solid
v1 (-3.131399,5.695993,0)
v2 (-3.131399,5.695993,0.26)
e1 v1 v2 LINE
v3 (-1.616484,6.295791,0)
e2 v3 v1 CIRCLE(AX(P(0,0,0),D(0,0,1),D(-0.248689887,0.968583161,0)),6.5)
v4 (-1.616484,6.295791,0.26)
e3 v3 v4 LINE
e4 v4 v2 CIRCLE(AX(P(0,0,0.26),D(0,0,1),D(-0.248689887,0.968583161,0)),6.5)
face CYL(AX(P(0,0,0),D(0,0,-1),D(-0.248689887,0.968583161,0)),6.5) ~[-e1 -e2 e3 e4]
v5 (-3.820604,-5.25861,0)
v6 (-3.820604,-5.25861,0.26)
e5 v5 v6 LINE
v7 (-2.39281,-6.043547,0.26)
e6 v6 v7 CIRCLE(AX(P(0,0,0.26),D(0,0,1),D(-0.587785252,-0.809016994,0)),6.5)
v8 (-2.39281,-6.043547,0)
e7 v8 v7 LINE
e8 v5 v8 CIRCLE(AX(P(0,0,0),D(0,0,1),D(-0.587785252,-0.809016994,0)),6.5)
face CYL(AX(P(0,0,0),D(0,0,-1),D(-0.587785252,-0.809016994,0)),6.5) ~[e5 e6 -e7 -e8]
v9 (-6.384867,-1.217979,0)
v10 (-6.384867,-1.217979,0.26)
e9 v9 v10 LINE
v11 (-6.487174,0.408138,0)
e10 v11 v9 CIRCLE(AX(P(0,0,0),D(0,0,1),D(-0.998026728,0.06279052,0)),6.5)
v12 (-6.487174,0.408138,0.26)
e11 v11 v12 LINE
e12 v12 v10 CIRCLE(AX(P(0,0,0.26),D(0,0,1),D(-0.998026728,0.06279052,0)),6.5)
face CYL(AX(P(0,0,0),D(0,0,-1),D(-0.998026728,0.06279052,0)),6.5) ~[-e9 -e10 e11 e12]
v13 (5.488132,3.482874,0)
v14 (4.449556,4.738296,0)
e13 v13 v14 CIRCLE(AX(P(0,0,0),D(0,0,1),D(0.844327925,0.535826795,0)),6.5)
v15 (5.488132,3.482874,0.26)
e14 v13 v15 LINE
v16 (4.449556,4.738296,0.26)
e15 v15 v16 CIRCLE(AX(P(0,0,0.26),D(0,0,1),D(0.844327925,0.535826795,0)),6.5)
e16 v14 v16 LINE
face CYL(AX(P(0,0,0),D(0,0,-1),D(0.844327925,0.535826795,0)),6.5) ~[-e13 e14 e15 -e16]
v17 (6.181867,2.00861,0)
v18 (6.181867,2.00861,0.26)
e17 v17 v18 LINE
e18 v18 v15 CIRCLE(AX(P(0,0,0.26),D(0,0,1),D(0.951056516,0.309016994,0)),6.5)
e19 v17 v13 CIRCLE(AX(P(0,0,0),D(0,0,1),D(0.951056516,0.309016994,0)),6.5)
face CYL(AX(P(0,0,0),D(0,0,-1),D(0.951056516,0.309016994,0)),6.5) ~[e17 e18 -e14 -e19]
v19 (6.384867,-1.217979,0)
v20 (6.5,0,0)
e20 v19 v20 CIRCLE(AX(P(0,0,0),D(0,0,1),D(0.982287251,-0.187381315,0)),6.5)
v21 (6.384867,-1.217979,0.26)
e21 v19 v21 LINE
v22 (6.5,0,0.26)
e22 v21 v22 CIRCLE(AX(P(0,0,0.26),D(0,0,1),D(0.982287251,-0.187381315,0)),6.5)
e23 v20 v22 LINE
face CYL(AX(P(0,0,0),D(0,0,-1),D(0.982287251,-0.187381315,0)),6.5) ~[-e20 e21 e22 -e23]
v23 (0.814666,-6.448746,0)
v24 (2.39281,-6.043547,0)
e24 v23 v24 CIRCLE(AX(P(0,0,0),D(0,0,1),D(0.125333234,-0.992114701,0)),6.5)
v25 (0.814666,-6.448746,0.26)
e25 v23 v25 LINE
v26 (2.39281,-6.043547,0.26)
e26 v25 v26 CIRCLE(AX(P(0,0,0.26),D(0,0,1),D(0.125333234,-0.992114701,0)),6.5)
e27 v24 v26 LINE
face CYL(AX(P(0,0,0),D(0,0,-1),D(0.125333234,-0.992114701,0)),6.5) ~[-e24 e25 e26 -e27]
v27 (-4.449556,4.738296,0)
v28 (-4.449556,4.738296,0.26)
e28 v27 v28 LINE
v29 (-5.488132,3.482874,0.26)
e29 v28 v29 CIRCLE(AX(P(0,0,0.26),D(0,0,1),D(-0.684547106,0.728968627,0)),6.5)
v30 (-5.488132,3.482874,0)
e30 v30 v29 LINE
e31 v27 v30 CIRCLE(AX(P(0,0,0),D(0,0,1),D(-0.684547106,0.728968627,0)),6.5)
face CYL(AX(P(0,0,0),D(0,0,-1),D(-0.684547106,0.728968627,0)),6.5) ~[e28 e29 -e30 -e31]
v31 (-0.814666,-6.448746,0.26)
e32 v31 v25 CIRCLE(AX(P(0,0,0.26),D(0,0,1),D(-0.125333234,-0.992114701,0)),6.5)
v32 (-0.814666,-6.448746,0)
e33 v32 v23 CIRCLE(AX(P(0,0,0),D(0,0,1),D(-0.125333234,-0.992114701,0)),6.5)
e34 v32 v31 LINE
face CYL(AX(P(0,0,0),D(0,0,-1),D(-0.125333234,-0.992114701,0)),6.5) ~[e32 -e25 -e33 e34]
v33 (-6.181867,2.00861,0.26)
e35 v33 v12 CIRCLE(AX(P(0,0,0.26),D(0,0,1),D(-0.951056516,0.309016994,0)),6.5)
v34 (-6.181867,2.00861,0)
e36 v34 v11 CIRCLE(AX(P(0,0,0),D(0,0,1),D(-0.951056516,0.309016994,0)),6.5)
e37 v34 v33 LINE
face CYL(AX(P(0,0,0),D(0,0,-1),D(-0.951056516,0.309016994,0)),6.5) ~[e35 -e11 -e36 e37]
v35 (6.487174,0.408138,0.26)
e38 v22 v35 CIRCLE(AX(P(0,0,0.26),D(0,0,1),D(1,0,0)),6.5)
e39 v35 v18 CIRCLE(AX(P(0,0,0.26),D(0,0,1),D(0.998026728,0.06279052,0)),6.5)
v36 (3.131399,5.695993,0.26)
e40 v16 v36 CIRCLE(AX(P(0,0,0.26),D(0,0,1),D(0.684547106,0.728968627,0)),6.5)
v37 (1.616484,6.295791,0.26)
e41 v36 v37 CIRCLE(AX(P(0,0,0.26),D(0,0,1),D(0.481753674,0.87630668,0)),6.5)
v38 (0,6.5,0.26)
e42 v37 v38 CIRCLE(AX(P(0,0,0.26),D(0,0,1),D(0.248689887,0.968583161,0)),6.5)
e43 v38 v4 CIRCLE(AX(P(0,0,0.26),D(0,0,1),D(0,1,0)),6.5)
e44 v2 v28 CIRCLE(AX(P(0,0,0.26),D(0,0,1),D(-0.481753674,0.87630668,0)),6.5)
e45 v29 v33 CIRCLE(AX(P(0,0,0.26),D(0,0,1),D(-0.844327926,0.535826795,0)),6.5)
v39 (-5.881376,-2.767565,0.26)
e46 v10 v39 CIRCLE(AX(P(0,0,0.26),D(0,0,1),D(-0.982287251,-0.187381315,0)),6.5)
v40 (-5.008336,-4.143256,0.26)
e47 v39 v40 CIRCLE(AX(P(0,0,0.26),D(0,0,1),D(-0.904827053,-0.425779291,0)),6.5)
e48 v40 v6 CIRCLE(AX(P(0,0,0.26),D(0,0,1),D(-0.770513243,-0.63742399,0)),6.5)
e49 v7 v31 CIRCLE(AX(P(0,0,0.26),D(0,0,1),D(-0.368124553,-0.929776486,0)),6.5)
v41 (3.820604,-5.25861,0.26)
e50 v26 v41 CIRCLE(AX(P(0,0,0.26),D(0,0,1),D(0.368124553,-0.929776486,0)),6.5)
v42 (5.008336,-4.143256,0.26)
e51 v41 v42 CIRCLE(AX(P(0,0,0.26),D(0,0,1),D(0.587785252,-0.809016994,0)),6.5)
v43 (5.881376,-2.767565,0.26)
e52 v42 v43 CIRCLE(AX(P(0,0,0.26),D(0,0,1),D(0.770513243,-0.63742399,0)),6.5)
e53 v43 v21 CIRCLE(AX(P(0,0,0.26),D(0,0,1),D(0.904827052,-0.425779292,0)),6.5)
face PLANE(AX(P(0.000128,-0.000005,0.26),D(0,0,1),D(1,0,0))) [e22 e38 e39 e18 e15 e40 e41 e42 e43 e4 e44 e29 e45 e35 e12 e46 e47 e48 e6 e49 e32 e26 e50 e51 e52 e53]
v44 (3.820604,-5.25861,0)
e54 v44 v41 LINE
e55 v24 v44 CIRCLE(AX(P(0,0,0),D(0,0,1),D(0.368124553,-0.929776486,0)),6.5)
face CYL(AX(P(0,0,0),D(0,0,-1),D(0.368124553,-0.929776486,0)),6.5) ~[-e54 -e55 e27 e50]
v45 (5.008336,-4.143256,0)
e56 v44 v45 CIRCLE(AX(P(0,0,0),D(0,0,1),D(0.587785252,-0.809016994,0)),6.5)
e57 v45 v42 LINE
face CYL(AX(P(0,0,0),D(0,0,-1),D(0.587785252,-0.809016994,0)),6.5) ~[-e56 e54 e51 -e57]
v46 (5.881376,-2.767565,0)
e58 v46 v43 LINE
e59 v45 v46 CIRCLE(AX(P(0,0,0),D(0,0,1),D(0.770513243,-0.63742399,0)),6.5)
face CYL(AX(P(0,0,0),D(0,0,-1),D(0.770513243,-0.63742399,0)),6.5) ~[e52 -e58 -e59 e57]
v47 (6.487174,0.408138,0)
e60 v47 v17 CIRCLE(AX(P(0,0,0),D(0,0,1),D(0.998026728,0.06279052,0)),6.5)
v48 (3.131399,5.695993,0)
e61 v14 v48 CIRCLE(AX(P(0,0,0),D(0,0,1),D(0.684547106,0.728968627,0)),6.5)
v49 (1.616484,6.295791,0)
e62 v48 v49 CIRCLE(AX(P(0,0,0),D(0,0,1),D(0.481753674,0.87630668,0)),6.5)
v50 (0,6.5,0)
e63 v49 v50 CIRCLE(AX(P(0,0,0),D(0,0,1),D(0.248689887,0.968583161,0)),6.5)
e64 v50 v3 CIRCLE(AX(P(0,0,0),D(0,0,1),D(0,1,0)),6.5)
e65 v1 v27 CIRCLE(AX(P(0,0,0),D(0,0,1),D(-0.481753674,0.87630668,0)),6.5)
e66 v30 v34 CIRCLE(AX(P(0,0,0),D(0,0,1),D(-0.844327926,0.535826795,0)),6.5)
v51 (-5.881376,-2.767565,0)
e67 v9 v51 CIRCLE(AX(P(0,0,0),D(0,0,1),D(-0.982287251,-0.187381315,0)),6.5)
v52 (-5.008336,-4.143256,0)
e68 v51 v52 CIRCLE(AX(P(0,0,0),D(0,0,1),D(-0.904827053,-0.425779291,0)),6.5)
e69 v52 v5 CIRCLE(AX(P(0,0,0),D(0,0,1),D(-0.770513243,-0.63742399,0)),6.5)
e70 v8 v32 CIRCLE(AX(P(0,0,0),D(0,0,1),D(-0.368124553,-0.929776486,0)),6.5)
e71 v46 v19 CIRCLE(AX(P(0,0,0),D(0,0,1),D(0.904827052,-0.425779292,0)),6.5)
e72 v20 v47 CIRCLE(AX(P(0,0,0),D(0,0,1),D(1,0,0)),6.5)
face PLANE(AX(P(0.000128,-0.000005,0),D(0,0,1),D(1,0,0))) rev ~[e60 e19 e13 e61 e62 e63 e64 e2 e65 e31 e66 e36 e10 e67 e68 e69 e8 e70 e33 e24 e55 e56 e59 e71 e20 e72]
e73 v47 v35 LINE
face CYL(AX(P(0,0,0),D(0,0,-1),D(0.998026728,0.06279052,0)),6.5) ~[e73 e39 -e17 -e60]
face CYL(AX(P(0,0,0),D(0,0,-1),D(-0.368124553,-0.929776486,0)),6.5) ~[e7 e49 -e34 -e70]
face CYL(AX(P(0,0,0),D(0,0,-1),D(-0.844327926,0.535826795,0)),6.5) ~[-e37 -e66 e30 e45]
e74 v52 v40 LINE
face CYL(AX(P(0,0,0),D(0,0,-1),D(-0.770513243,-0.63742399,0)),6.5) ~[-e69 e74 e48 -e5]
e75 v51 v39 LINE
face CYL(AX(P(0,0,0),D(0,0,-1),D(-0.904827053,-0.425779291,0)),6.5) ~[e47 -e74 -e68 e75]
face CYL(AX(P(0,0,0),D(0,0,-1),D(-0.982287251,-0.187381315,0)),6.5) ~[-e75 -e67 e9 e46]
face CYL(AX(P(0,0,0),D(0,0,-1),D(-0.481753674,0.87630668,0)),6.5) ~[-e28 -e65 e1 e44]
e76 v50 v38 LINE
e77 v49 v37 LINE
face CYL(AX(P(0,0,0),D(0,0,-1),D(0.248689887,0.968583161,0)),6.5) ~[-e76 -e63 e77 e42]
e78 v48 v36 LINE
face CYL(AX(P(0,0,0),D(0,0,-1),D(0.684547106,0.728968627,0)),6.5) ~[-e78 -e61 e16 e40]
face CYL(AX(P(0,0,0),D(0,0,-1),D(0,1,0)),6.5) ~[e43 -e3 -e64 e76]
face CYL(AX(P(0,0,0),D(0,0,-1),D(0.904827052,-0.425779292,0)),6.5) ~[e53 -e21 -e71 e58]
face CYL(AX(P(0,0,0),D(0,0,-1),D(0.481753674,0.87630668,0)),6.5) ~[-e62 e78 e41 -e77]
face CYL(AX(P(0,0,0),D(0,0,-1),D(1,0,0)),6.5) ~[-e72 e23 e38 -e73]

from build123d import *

# Parameters (mm, degrees)
F1_DEPTH = 0.26


with BuildPart() as f1:
    # F0 (on Top) → F1 (new body)
    with BuildSketch(Plane.XY):
        with BuildLine():
            ThreePointArc((6.5, 0), (6.4967926424, 0.204169934), (6.4871737348, 0.4081383769))
            ThreePointArc((6.4871737348, 0.4081383769), (6.3848671297, 1.2179785448), (6.1818673559, 2.0086104634))
            ThreePointArc((6.1818673559, 2.0086104634), (5.881375841, 2.7675653952), (5.4881315158, 3.4828741674))
            ThreePointArc((5.4881315158, 3.4828741674), (5.008336078, 4.1432559334), (4.4495561885, 4.7382960782))
            ThreePointArc((4.4495561885, 4.7382960782), (3.8206041399, 5.2586104634), (3.1313988817, 5.6959934203))
            ThreePointArc((3.1313988817, 5.6959934203), (2.3928095925, 6.0435471583), (1.6164842666, 6.2957905473))
            ThreePointArc((1.6164842666, 6.2957905473), (0.8146660182, 6.4487455585), (0, 6.5))
            ThreePointArc((0, 6.5), (-0.8146660182, 6.4487455585), (-1.6164842666, 6.2957905473))
            ThreePointArc((-1.6164842666, 6.2957905473), (-2.3928095925, 6.0435471583), (-3.1313988817, 5.6959934203))
            ThreePointArc((-3.1313988817, 5.6959934203), (-3.8206041399, 5.2586104634), (-4.4495561885, 4.7382960782))
            ThreePointArc((-4.4495561885, 4.7382960782), (-5.008336078, 4.1432559334), (-5.4881315158, 3.4828741674))
            ThreePointArc((-5.4881315158, 3.4828741674), (-5.881375841, 2.7675653952), (-6.1818673559, 2.0086104634))
            ThreePointArc((-6.1818673559, 2.0086104634), (-6.3848671297, 1.2179785448), (-6.4871737348, 0.4081383769))
            ThreePointArc((-6.4871737348, 0.4081383769), (-6.4871737348, -0.4081383769), (-6.3848671297, -1.2179785448))
            ThreePointArc((-6.3848671297, -1.2179785448), (-6.1818673559, -2.0086104634), (-5.881375841, -2.7675653952))
            ThreePointArc((-5.881375841, -2.7675653952), (-5.4881315158, -3.4828741674), (-5.008336078, -4.1432559334))
            ThreePointArc((-5.008336078, -4.1432559334), (-4.4495561885, -4.7382960782), (-3.8206041399, -5.2586104634))
            ThreePointArc((-3.8206041399, -5.2586104634), (-3.1313988817, -5.6959934203), (-2.3928095925, -6.0435471583))
            ThreePointArc((-2.3928095925, -6.0435471583), (-1.6164842666, -6.2957905473), (-0.8146660182, -6.4487455585))
            ThreePointArc((-0.8146660182, -6.4487455585), (0, -6.5), (0.8146660182, -6.4487455585))
            ThreePointArc((0.8146660182, -6.4487455585), (1.6164842666, -6.2957905473), (2.3928095925, -6.0435471583))
            ThreePointArc((2.3928095925, -6.0435471583), (3.1313988817, -5.6959934203), (3.8206041399, -5.2586104634))
            ThreePointArc((3.8206041399, -5.2586104634), (4.4495561885, -4.7382960782), (5.008336078, -4.1432559334))
            ThreePointArc((5.008336078, -4.1432559334), (5.4881315158, -3.4828741674), (5.881375841, -2.7675653952))
            ThreePointArc((5.881375841, -2.7675653952), (6.1818673559, -2.0086104634), (6.3848671297, -1.2179785448))
            ThreePointArc((6.3848671297, -1.2179785448), (6.4711527699, -0.6117040366), (6.5, 0))
        make_face()
    extrude(amount=F1_DEPTH)


solid = f1.part
